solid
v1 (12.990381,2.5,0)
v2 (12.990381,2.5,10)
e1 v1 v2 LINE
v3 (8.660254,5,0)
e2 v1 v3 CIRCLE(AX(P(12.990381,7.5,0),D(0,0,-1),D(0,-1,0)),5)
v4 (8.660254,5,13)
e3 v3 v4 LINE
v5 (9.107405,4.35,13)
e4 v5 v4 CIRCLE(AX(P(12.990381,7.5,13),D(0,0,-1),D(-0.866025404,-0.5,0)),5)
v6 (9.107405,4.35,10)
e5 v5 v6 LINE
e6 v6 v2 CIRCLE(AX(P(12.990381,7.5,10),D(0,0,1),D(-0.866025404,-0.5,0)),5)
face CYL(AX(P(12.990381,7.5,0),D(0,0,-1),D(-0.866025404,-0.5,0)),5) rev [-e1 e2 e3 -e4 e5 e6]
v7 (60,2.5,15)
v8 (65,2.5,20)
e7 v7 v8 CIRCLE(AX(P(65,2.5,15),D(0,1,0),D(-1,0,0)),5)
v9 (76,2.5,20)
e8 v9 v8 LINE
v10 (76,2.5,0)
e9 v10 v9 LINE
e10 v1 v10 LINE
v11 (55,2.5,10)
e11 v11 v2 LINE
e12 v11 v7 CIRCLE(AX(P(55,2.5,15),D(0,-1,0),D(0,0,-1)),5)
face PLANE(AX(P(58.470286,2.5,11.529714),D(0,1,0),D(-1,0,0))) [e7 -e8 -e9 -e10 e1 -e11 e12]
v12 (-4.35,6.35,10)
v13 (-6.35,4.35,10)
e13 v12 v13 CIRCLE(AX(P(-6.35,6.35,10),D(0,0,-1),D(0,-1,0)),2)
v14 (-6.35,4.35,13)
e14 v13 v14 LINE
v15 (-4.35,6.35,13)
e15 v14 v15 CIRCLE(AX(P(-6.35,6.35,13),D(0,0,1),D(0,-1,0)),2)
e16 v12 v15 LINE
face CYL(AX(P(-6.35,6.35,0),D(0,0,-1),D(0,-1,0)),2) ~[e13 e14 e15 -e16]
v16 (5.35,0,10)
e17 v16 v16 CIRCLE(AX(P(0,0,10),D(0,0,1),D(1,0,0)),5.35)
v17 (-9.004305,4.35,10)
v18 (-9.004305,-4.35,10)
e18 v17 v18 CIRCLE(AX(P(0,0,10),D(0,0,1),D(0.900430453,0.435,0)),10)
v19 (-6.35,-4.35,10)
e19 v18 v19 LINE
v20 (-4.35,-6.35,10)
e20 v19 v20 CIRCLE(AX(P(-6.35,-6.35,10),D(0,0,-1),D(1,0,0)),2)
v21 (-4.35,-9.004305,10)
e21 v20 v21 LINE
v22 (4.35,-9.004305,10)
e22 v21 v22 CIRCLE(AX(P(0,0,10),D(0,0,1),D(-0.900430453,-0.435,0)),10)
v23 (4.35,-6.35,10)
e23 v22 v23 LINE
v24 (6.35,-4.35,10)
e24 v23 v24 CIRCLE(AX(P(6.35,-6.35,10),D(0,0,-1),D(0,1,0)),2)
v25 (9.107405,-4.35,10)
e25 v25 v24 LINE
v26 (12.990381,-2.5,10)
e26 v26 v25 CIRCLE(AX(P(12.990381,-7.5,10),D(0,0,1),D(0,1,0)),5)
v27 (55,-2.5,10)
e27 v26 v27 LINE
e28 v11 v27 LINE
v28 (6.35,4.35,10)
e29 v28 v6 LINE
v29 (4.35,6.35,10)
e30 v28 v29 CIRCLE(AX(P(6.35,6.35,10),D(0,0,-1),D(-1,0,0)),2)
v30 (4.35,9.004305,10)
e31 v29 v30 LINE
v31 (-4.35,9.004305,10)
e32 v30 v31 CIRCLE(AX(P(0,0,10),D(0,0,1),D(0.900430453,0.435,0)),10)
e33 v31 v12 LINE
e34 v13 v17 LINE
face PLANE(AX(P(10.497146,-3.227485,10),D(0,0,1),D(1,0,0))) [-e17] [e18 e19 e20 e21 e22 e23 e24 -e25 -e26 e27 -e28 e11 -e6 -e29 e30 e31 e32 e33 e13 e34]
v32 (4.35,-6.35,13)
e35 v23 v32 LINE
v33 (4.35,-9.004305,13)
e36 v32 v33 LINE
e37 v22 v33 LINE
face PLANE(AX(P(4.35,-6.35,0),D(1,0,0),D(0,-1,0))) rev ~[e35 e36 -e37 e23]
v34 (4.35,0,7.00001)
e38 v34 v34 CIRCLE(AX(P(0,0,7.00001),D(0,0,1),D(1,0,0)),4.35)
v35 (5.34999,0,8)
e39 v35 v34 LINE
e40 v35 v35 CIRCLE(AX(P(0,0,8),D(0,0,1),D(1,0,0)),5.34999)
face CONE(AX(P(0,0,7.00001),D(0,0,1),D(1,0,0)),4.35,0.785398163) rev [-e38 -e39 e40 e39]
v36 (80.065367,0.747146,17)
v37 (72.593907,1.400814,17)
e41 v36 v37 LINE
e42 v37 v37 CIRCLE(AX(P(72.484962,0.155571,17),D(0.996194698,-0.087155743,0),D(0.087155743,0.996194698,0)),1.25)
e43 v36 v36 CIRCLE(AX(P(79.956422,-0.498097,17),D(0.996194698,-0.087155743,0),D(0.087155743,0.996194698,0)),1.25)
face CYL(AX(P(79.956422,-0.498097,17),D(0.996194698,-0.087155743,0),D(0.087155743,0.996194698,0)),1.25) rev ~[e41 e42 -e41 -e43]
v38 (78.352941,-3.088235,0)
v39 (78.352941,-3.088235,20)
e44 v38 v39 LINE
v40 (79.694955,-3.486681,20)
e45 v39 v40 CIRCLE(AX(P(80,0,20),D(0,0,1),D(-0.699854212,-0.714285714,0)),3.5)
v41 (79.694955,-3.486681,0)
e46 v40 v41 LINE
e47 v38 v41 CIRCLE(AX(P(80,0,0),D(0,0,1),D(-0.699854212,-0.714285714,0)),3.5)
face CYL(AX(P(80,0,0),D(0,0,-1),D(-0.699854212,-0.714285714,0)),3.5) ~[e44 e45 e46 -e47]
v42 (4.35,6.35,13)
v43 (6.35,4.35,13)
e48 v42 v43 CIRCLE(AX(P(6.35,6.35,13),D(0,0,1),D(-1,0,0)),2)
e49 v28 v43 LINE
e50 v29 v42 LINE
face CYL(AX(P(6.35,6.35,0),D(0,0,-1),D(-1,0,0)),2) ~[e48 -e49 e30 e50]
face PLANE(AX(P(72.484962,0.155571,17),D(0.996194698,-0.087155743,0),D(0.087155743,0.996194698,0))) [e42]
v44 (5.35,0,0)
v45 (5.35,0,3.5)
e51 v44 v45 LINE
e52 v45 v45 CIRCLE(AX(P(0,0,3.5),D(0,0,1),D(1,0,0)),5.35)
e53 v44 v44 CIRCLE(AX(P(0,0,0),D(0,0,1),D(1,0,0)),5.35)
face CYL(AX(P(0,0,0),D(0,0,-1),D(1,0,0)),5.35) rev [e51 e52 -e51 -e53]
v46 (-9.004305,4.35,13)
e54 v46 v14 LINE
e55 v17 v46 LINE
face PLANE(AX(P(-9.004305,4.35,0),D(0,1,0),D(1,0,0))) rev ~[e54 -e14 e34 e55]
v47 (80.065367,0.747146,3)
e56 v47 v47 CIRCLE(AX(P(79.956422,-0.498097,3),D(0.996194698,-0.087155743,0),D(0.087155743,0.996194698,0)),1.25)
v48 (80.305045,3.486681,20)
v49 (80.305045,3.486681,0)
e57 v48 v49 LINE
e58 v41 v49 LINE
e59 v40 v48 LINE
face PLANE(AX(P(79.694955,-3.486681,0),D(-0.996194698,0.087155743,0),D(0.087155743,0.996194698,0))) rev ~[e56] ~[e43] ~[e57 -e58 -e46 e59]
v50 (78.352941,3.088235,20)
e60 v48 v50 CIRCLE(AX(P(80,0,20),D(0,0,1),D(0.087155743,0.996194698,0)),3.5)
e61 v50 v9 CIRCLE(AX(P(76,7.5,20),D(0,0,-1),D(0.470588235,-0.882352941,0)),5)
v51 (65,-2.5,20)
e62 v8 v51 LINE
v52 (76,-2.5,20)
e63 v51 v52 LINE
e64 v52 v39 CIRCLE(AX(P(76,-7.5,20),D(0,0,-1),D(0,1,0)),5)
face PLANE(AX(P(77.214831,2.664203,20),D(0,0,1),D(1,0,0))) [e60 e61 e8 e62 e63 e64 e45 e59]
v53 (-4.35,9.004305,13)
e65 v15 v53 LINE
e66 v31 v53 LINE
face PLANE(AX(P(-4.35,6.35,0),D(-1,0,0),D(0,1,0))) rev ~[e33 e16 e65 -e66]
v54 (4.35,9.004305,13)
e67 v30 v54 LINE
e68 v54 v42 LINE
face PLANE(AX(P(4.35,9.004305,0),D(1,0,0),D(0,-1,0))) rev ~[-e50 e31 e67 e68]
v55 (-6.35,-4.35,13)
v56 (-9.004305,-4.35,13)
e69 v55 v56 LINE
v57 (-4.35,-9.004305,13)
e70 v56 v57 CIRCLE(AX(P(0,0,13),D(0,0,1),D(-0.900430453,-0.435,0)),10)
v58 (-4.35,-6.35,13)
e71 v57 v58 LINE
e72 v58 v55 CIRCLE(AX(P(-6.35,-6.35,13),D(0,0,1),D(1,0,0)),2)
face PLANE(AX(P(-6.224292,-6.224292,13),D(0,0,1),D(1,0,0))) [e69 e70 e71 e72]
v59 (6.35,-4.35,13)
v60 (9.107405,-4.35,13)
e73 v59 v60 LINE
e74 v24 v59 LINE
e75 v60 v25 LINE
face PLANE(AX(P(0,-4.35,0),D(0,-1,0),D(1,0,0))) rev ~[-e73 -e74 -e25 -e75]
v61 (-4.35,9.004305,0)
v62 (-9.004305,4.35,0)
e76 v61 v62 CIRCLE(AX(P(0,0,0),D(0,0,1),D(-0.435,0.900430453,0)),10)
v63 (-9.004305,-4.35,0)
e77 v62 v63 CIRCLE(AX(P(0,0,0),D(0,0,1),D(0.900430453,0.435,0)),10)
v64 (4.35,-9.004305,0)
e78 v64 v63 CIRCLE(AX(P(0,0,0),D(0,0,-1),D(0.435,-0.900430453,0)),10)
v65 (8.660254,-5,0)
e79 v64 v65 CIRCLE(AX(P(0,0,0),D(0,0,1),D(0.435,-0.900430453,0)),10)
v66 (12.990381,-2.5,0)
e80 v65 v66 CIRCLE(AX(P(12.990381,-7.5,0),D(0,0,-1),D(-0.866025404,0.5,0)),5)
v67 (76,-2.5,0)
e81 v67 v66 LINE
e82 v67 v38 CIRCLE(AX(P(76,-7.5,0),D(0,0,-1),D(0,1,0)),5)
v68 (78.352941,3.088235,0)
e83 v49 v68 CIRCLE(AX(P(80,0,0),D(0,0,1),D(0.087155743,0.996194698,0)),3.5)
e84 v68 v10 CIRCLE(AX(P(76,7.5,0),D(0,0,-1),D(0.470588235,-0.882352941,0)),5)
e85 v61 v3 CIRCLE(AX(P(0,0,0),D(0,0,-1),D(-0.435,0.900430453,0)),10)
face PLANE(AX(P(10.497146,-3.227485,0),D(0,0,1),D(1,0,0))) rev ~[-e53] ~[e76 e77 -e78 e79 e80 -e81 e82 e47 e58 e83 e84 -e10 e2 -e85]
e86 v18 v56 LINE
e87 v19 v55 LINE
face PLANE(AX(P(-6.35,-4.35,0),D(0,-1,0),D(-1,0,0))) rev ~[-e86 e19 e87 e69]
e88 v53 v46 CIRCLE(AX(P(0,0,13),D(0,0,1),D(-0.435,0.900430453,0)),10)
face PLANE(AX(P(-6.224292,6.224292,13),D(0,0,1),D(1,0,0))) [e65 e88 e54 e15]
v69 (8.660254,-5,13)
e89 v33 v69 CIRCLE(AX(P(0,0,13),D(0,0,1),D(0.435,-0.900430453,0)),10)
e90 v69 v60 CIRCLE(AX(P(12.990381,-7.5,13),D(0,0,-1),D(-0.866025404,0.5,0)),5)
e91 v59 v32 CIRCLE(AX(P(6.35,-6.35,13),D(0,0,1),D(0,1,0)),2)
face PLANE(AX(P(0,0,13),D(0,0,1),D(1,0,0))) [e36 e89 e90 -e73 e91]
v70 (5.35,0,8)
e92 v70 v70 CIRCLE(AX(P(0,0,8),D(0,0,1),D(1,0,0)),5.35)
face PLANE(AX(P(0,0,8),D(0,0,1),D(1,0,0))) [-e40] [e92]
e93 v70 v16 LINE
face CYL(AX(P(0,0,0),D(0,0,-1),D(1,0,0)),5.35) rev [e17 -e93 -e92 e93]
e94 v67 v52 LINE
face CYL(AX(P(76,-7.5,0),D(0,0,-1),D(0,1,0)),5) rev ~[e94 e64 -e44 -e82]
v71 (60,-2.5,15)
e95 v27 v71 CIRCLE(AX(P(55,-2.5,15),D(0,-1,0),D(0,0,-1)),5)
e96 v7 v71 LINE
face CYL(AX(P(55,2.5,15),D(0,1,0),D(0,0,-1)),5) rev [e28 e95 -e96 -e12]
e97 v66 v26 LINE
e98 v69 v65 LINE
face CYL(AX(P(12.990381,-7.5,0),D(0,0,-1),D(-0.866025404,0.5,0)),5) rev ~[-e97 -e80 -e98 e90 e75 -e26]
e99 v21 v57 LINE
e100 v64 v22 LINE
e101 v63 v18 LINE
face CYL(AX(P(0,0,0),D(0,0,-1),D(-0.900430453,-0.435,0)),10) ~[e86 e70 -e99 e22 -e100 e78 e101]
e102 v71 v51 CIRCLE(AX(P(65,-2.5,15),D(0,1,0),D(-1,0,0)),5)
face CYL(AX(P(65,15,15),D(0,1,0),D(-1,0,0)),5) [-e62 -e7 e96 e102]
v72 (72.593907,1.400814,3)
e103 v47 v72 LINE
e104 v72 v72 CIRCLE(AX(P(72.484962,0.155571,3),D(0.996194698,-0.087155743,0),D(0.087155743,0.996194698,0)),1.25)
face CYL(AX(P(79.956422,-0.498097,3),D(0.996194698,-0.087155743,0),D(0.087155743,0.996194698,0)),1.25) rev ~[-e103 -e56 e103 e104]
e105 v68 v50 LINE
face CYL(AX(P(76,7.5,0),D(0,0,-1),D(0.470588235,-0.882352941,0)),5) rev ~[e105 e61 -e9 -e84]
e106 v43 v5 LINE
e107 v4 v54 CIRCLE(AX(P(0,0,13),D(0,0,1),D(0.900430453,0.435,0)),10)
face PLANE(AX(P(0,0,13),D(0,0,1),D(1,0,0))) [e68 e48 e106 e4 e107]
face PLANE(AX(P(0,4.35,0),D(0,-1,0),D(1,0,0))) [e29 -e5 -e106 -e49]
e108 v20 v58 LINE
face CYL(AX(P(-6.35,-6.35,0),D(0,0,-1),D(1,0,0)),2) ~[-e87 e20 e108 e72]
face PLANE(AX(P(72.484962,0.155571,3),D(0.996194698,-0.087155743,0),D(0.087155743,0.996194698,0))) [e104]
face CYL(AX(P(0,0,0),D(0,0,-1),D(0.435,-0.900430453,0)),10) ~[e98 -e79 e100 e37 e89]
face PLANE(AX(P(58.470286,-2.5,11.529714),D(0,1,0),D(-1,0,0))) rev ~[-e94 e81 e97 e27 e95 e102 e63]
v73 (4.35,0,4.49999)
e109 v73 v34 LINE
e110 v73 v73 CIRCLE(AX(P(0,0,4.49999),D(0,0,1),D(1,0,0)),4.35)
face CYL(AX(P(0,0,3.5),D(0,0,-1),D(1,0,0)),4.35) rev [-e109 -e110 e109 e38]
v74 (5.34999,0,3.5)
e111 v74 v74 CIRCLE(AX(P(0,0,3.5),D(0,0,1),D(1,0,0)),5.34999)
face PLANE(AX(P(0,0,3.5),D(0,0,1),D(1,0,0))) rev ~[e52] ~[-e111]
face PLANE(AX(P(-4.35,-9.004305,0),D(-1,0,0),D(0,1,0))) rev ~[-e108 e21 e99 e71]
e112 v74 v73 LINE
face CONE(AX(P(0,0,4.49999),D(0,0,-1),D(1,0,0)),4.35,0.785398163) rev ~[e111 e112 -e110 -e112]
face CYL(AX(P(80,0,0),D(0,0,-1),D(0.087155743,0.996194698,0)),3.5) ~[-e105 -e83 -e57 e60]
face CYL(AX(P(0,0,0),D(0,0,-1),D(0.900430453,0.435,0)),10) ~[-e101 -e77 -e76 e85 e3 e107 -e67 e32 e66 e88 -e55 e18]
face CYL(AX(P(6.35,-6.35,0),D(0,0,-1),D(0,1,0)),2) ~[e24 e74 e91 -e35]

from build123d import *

# Parameters (mm, degrees)
F0_R         = 5.35
F1_DEPTH     = 10
F2_START     = 3.5
F0_R_2       = 4.35
F2_DEPTH     = 4.5
F3_SIZE      = 0.99999
F4_DEPTH     = 13
F5_DEPTH     = 20
F6_R         = 1.25
F7_DEPTH     = 7.5
F8_T1_DEPTH  = 20
F8_T3_DEPTH  = 5
F8_T8_DEPTH  = 10
F8_T13_DEPTH = 10
F8_T18_DEPTH = 18.2698067281
F8_T25_DEPTH = 10
F8_T30_DEPTH = 10
F8_T35_DEPTH = 18.2698067281
F8_T39_DEPTH = 30


# Not quite as in the source:
# - a fillet or chamfer that OpenCascade refuses, or shapes differently, is made with other operations: its cross-section is extruded or revolved along the edge and cut away or added
# - a fillet or chamfer is up to 0.001 mm smaller than in the source, because OpenCascade refuses the exact size


with BuildPart() as f1:
    # F0 (on Top) → F1 (new body)
    with BuildSketch(Plane.XY):
        with BuildLine():
            Line((-4.35, 6.35), (-4.35, 9.0043045262))
            ThreePointArc((-4.35, 9.0043045262), (-7.0710678119, 7.0710678119), (-9.0043045262, 4.35))
            Line((-9.0043045262, 4.35), (-6.35, 4.35))
            ThreePointArc((-6.35, 4.35), (-4.9357864376, 4.9357864376), (-4.35, 6.35))
        make_face()
        with BuildLine():
            ThreePointArc((9.6824583655, -2.5), (9.9202969627, -1.2600429248), (10, 0))
            ThreePointArc((10, 0), (9.9202969627, 1.2600429248), (9.6824583655, 2.5))
            ThreePointArc((9.6824583655, 2.5), (9.3890575588, 3.4417434764), (9.0043045262, 4.35))
            Line((9.0043045262, 4.35), (6.35, 4.35))
            ThreePointArc((6.35, 4.35), (4.9357864376, 4.9357864376), (4.35, 6.35))
            Line((4.35, 6.35), (4.35, 9.0043045262))
            ThreePointArc((4.35, 9.0043045262), (0, 10), (-4.35, 9.0043045262))
            Line((-4.35, 9.0043045262), (-4.35, 6.35))
            ThreePointArc((-4.35, 6.35), (-4.9357864376, 4.9357864376), (-6.35, 4.35))
            Line((-6.35, 4.35), (-9.0043045262, 4.35))
            ThreePointArc((-9.0043045262, 4.35), (-10, 0), (-9.0043045262, -4.35))
            Line((-9.0043045262, -4.35), (-6.35, -4.35))
            ThreePointArc((-6.35, -4.35), (-4.9357864376, -4.9357864376), (-4.35, -6.35))
            Line((-4.35, -6.35), (-4.35, -9.0043045262))
            ThreePointArc((-4.35, -9.0043045262), (0, -10), (4.35, -9.0043045262))
            Line((4.35, -9.0043045262), (4.35, -6.35))
            ThreePointArc((4.35, -6.35), (4.9357864376, -4.9357864376), (6.35, -4.35))
            Line((6.35, -4.35), (9.0043045262, -4.35))
            ThreePointArc((9.0043045262, -4.35), (9.3890575588, -3.4417434764), (9.6824583655, -2.5))
        make_face()
        Circle(F0_R, mode=Mode.SUBTRACT)
        with BuildLine():
            ThreePointArc((-9.0043045262, -4.35), (-7.0710678119, -7.0710678119), (-4.35, -9.0043045262))
            Line((-4.35, -9.0043045262), (-4.35, -6.35))
            ThreePointArc((-4.35, -6.35), (-4.9357864376, -4.9357864376), (-6.35, -4.35))
            Line((-6.35, -4.35), (-9.0043045262, -4.35))
        make_face()
        with BuildLine():
            ThreePointArc((4.35, -9.0043045262), (7.0710678119, -7.0710678119), (9.0043045262, -4.35))
            Line((9.0043045262, -4.35), (6.35, -4.35))
            ThreePointArc((6.35, -4.35), (4.9357864376, -4.9357864376), (4.35, -6.35))
            Line((4.35, -6.35), (4.35, -9.0043045262))
        make_face()
        with BuildLine():
            Line((6.35, 4.35), (9.0043045262, 4.35))
            ThreePointArc((9.0043045262, 4.35), (7.0710678119, 7.0710678119), (4.35, 9.0043045262))
            Line((4.35, 9.0043045262), (4.35, 6.35))
            ThreePointArc((4.35, 6.35), (4.9357864376, 4.9357864376), (6.35, 4.35))
        make_face()
        with BuildLine():
            ThreePointArc((9.6824583655, 2.5), (9.9202969627, 1.2600429248), (10, 0))
            ThreePointArc((10, 0), (9.9202969627, -1.2600429248), (9.6824583655, -2.5))
            Line((9.6824583655, -2.5), (60, -2.5))
            Line((60, -2.5), (60, 2.5))
            Line((60, 2.5), (9.6824583655, 2.5))
        make_face()
        with BuildLine():
            Line((77.5505102572, 2.5), (60, 2.5))
            Line((60, 2.5), (60, -2.5))
            Line((60, -2.5), (77.5505102572, -2.5))
            ThreePointArc((77.5505102572, -2.5), (76.5, 0), (77.5505102572, 2.5))
        make_face()
        with BuildLine():
            ThreePointArc((80.3050450996, 3.4866814433), (78.8197263984, 3.2949892603), (77.5505102572, 2.5))
            ThreePointArc((77.5505102572, 2.5), (76.5, 0), (77.5505102572, -2.5))
            ThreePointArc((77.5505102572, -2.5), (78.5370404595, -3.179583209), (79.6949549004, -3.4866814433))
            Line((79.6949549004, -3.4866814433), (80, 0))
            Line((80, 0), (80.3050450996, 3.4866814433))
        make_face()
    extrude(amount=F1_DEPTH)

    # F0 (on Top) → F2 (join)
    with BuildSketch(Plane.XY.offset(F2_START)):
        Circle(F0_R)
        Circle(F0_R_2, mode=Mode.SUBTRACT)
    extrude(amount=F2_DEPTH)

    # F3 (size 1 in the source; OpenCascade refuses exactly that, so slightly less here)
    f3_edges = [f1.edges().sort_by_distance(p)[0] for p in [
        (-4.35, 0, 3.5),
        (-4.35, 0, 8),
    ]]
    chamfer(f3_edges, length=F3_SIZE)

    # F0 (on Top) → F4 (join)
    with BuildSketch(Plane.XY):
        with BuildLine():
            ThreePointArc((-9.0043045262, -4.35), (-7.0710678119, -7.0710678119), (-4.35, -9.0043045262))
            Line((-4.35, -9.0043045262), (-4.35, -6.35))
            ThreePointArc((-4.35, -6.35), (-4.9357864376, -4.9357864376), (-6.35, -4.35))
            Line((-6.35, -4.35), (-9.0043045262, -4.35))
        make_face()
        with BuildLine():
            ThreePointArc((4.35, -9.0043045262), (7.0710678119, -7.0710678119), (9.0043045262, -4.35))
            Line((9.0043045262, -4.35), (6.35, -4.35))
            ThreePointArc((6.35, -4.35), (4.9357864376, -4.9357864376), (4.35, -6.35))
            Line((4.35, -6.35), (4.35, -9.0043045262))
        make_face()
        with BuildLine():
            Line((6.35, 4.35), (9.0043045262, 4.35))
            ThreePointArc((9.0043045262, 4.35), (7.0710678119, 7.0710678119), (4.35, 9.0043045262))
            Line((4.35, 9.0043045262), (4.35, 6.35))
            ThreePointArc((4.35, 6.35), (4.9357864376, 4.9357864376), (6.35, 4.35))
        make_face()
        with BuildLine():
            Line((-4.35, 6.35), (-4.35, 9.0043045262))
            ThreePointArc((-4.35, 9.0043045262), (-7.0710678119, 7.0710678119), (-9.0043045262, 4.35))
            Line((-9.0043045262, 4.35), (-6.35, 4.35))
            ThreePointArc((-6.35, 4.35), (-4.9357864376, 4.9357864376), (-4.35, 6.35))
        make_face()
    extrude(amount=F4_DEPTH)

    # F0 (on Top) → F5 (join)
    with BuildSketch(Plane.XY):
        with BuildLine():
            ThreePointArc((80.3050450996, 3.4866814433), (78.8197263984, 3.2949892603), (77.5505102572, 2.5))
            ThreePointArc((77.5505102572, 2.5), (76.5, 0), (77.5505102572, -2.5))
            ThreePointArc((77.5505102572, -2.5), (78.5370404595, -3.179583209), (79.6949549004, -3.4866814433))
            Line((79.6949549004, -3.4866814433), (80, 0))
            Line((80, 0), (80.3050450996, 3.4866814433))
        make_face()
        with BuildLine():
            Line((77.5505102572, 2.5), (60, 2.5))
            Line((60, 2.5), (60, -2.5))
            Line((60, -2.5), (77.5505102572, -2.5))
            ThreePointArc((77.5505102572, -2.5), (76.5, 0), (77.5505102572, 2.5))
        make_face()
    extrude(amount=F5_DEPTH)

    # F6 (on face) → F7 (cut)
    with BuildSketch(Plane(origin=(79.3923101205, -6.9459271067, 0), x_dir=(0.0871557427, 0.9961946981, 0), z_dir=(0.9961946981, -0.0871557427, 0))):
        with Locations((6.4724594198, 17)):
            Circle(F6_R)
        with Locations((6.4724594198, 3)):
            Circle(F6_R)
    extrude(amount=-F7_DEPTH, mode=Mode.SUBTRACT)

    # F8: fillet of radius 5 on 6 edges, made by hand

    # F8_s2 → F8_t1 (join)
    with BuildSketch(Plane.XY):
        with BuildLine():
            ThreePointArc((78.3529411765, 3.0882352941), (77.2126781252, 2.6492874993), (76, 2.5))
            Line((76, 2.5), (77.5505102572, 2.5))
            ThreePointArc((77.5505102572, 2.5), (77.9307168562, 2.822776518), (78.3529411765, 3.0882352941))
        make_face()
        with BuildLine():
            ThreePointArc((76, -2.5), (77.2126781252, -2.6492874993), (78.3529411765, -3.0882352941))
            ThreePointArc((78.3529411765, -3.0882352941), (77.9307168562, -2.822776518), (77.5505102572, -2.5))
            Line((77.5505102572, -2.5), (76, -2.5))
        make_face()
    extrude(amount=F8_T1_DEPTH)

    # F8_s4 → F8_t3 (join)
    with BuildSketch(Plane.XZ.offset(-2.5)):
        with BuildLine():
            ThreePointArc((55, 10), (58.5355339059, 11.4644660941), (60, 15))
            Line((60, 15), (60, 10))
            Line((60, 10), (55, 10))
        make_face()
    extrude(amount=F8_T3_DEPTH)


with BuildPart() as f8_tool6:
    # F8_s7 → F8_t8 (new body)
    with BuildSketch(Plane.XY):
        with BuildLine():
            ThreePointArc((8.6602540378, 5), (10.4903810568, 3.1698729811), (12.9903810568, 2.5))
            Line((12.9903810568, 2.5), (9.6824583655, 2.5))
            ThreePointArc((9.6824583655, 2.5), (9.2561479341, 3.7846697903), (8.6602540378, 5))
        make_face()
    extrude(amount=F8_T8_DEPTH)

    split(bisect_by=Plane.XZ.offset(-4.35), keep=Keep.BOTTOM)


with BuildPart() as f1_1:
    add(f1.part)

    # F8_t5: union F8_tool6
    add(f8_tool6.part)


with BuildPart() as f8_tool11:
    # F8_s12 → F8_t13 (new body)
    with BuildSketch(Plane.XY):
        with BuildLine():
            ThreePointArc((8.6602540378, 5), (10.4903810568, 3.1698729811), (12.9903810568, 2.5))
            Line((12.9903810568, 2.5), (9.6824583655, 2.5))
            ThreePointArc((9.6824583655, 2.5), (9.2561479341, 3.7846697903), (8.6602540378, 5))
        make_face()
    extrude(amount=F8_T13_DEPTH)

    split(bisect_by=Plane.XZ.offset(-4.35), keep=Keep.TOP)


with BuildPart() as f1_2:
    add(f1_1.part)

    # F8_t10: union F8_tool11
    add(f8_tool11.part)


with BuildPart() as f8_tool16:
    # F8_s17 → F8_t18 (new body)
    with BuildSketch(Plane.XY):
        with BuildLine():
            ThreePointArc((8.6602540378, 5), (10.4903810568, 3.1698729811), (12.9903810568, 2.5))
            Line((12.9903810568, 2.5), (9.6824583655, 2.5))
            ThreePointArc((9.6824583655, 2.5), (9.2561479341, 3.7846697903), (8.6602540378, 5))
        make_face()
    extrude(amount=F8_T18_DEPTH)

    split(bisect_by=Plane.XY.offset(10), keep=Keep.TOP)

    split(bisect_by=Plane.XZ.offset(-4.35), keep=Keep.BOTTOM)

    split(bisect_by=Plane.XY.offset(13), keep=Keep.BOTTOM)


with BuildPart() as f1_3:
    add(f1_2.part)

    # F8_t15: union F8_tool16
    add(f8_tool16.part)


with BuildPart() as f8_tool23:
    # F8_s24 → F8_t25 (new body)
    with BuildSketch(Plane.XY):
        with BuildLine():
            ThreePointArc((8.6602540378, -5), (10.4903810568, -3.1698729811), (12.9903810568, -2.5))
            Line((12.9903810568, -2.5), (9.6824583655, -2.5))
            ThreePointArc((9.6824583655, -2.5), (9.2561479341, -3.7846697903), (8.6602540378, -5))
        make_face()
    extrude(amount=F8_T25_DEPTH)

    split(bisect_by=Plane.XZ.offset(4.35), keep=Keep.TOP)


with BuildPart() as f1_4:
    add(f1_3.part)

    # F8_t22: union F8_tool23
    add(f8_tool23.part)


with BuildPart() as f8_tool28:
    # F8_s29 → F8_t30 (new body)
    with BuildSketch(Plane.XY):
        with BuildLine():
            ThreePointArc((8.6602540378, -5), (10.4903810568, -3.1698729811), (12.9903810568, -2.5))
            Line((12.9903810568, -2.5), (9.6824583655, -2.5))
            ThreePointArc((9.6824583655, -2.5), (9.2561479341, -3.7846697903), (8.6602540378, -5))
        make_face()
    extrude(amount=F8_T30_DEPTH)

    split(bisect_by=Plane.XZ.offset(4.35), keep=Keep.BOTTOM)


with BuildPart() as f1_5:
    add(f1_4.part)

    # F8_t27: union F8_tool28
    add(f8_tool28.part)


with BuildPart() as f8_tool33:
    # F8_s34 → F8_t35 (new body)
    with BuildSketch(Plane.XY):
        with BuildLine():
            ThreePointArc((8.6602540378, -5), (10.4903810568, -3.1698729811), (12.9903810568, -2.5))
            Line((12.9903810568, -2.5), (9.6824583655, -2.5))
            ThreePointArc((9.6824583655, -2.5), (9.2561479341, -3.7846697903), (8.6602540378, -5))
        make_face()
    extrude(amount=F8_T35_DEPTH)

    split(bisect_by=Plane.XY.offset(10), keep=Keep.TOP)

    split(bisect_by=Plane.XY.offset(13), keep=Keep.BOTTOM)

    split(bisect_by=Plane.XZ.offset(4.35), keep=Keep.TOP)


with BuildPart() as f1_6:
    add(f1_5.part)

    # F8_t32: union F8_tool33
    add(f8_tool33.part)

    # F8_s40 → F8_t39 (cut)
    with BuildSketch(Plane.XZ.offset(-15)):
        with BuildLine():
            ThreePointArc((60, 15), (61.4644660941, 18.5355339059), (65, 20))
            Line((65, 20), (60, 20))
            Line((60, 20), (60, 15))
        make_face()
    extrude(amount=F8_T39_DEPTH, mode=Mode.SUBTRACT)


solid = f1_6.part
